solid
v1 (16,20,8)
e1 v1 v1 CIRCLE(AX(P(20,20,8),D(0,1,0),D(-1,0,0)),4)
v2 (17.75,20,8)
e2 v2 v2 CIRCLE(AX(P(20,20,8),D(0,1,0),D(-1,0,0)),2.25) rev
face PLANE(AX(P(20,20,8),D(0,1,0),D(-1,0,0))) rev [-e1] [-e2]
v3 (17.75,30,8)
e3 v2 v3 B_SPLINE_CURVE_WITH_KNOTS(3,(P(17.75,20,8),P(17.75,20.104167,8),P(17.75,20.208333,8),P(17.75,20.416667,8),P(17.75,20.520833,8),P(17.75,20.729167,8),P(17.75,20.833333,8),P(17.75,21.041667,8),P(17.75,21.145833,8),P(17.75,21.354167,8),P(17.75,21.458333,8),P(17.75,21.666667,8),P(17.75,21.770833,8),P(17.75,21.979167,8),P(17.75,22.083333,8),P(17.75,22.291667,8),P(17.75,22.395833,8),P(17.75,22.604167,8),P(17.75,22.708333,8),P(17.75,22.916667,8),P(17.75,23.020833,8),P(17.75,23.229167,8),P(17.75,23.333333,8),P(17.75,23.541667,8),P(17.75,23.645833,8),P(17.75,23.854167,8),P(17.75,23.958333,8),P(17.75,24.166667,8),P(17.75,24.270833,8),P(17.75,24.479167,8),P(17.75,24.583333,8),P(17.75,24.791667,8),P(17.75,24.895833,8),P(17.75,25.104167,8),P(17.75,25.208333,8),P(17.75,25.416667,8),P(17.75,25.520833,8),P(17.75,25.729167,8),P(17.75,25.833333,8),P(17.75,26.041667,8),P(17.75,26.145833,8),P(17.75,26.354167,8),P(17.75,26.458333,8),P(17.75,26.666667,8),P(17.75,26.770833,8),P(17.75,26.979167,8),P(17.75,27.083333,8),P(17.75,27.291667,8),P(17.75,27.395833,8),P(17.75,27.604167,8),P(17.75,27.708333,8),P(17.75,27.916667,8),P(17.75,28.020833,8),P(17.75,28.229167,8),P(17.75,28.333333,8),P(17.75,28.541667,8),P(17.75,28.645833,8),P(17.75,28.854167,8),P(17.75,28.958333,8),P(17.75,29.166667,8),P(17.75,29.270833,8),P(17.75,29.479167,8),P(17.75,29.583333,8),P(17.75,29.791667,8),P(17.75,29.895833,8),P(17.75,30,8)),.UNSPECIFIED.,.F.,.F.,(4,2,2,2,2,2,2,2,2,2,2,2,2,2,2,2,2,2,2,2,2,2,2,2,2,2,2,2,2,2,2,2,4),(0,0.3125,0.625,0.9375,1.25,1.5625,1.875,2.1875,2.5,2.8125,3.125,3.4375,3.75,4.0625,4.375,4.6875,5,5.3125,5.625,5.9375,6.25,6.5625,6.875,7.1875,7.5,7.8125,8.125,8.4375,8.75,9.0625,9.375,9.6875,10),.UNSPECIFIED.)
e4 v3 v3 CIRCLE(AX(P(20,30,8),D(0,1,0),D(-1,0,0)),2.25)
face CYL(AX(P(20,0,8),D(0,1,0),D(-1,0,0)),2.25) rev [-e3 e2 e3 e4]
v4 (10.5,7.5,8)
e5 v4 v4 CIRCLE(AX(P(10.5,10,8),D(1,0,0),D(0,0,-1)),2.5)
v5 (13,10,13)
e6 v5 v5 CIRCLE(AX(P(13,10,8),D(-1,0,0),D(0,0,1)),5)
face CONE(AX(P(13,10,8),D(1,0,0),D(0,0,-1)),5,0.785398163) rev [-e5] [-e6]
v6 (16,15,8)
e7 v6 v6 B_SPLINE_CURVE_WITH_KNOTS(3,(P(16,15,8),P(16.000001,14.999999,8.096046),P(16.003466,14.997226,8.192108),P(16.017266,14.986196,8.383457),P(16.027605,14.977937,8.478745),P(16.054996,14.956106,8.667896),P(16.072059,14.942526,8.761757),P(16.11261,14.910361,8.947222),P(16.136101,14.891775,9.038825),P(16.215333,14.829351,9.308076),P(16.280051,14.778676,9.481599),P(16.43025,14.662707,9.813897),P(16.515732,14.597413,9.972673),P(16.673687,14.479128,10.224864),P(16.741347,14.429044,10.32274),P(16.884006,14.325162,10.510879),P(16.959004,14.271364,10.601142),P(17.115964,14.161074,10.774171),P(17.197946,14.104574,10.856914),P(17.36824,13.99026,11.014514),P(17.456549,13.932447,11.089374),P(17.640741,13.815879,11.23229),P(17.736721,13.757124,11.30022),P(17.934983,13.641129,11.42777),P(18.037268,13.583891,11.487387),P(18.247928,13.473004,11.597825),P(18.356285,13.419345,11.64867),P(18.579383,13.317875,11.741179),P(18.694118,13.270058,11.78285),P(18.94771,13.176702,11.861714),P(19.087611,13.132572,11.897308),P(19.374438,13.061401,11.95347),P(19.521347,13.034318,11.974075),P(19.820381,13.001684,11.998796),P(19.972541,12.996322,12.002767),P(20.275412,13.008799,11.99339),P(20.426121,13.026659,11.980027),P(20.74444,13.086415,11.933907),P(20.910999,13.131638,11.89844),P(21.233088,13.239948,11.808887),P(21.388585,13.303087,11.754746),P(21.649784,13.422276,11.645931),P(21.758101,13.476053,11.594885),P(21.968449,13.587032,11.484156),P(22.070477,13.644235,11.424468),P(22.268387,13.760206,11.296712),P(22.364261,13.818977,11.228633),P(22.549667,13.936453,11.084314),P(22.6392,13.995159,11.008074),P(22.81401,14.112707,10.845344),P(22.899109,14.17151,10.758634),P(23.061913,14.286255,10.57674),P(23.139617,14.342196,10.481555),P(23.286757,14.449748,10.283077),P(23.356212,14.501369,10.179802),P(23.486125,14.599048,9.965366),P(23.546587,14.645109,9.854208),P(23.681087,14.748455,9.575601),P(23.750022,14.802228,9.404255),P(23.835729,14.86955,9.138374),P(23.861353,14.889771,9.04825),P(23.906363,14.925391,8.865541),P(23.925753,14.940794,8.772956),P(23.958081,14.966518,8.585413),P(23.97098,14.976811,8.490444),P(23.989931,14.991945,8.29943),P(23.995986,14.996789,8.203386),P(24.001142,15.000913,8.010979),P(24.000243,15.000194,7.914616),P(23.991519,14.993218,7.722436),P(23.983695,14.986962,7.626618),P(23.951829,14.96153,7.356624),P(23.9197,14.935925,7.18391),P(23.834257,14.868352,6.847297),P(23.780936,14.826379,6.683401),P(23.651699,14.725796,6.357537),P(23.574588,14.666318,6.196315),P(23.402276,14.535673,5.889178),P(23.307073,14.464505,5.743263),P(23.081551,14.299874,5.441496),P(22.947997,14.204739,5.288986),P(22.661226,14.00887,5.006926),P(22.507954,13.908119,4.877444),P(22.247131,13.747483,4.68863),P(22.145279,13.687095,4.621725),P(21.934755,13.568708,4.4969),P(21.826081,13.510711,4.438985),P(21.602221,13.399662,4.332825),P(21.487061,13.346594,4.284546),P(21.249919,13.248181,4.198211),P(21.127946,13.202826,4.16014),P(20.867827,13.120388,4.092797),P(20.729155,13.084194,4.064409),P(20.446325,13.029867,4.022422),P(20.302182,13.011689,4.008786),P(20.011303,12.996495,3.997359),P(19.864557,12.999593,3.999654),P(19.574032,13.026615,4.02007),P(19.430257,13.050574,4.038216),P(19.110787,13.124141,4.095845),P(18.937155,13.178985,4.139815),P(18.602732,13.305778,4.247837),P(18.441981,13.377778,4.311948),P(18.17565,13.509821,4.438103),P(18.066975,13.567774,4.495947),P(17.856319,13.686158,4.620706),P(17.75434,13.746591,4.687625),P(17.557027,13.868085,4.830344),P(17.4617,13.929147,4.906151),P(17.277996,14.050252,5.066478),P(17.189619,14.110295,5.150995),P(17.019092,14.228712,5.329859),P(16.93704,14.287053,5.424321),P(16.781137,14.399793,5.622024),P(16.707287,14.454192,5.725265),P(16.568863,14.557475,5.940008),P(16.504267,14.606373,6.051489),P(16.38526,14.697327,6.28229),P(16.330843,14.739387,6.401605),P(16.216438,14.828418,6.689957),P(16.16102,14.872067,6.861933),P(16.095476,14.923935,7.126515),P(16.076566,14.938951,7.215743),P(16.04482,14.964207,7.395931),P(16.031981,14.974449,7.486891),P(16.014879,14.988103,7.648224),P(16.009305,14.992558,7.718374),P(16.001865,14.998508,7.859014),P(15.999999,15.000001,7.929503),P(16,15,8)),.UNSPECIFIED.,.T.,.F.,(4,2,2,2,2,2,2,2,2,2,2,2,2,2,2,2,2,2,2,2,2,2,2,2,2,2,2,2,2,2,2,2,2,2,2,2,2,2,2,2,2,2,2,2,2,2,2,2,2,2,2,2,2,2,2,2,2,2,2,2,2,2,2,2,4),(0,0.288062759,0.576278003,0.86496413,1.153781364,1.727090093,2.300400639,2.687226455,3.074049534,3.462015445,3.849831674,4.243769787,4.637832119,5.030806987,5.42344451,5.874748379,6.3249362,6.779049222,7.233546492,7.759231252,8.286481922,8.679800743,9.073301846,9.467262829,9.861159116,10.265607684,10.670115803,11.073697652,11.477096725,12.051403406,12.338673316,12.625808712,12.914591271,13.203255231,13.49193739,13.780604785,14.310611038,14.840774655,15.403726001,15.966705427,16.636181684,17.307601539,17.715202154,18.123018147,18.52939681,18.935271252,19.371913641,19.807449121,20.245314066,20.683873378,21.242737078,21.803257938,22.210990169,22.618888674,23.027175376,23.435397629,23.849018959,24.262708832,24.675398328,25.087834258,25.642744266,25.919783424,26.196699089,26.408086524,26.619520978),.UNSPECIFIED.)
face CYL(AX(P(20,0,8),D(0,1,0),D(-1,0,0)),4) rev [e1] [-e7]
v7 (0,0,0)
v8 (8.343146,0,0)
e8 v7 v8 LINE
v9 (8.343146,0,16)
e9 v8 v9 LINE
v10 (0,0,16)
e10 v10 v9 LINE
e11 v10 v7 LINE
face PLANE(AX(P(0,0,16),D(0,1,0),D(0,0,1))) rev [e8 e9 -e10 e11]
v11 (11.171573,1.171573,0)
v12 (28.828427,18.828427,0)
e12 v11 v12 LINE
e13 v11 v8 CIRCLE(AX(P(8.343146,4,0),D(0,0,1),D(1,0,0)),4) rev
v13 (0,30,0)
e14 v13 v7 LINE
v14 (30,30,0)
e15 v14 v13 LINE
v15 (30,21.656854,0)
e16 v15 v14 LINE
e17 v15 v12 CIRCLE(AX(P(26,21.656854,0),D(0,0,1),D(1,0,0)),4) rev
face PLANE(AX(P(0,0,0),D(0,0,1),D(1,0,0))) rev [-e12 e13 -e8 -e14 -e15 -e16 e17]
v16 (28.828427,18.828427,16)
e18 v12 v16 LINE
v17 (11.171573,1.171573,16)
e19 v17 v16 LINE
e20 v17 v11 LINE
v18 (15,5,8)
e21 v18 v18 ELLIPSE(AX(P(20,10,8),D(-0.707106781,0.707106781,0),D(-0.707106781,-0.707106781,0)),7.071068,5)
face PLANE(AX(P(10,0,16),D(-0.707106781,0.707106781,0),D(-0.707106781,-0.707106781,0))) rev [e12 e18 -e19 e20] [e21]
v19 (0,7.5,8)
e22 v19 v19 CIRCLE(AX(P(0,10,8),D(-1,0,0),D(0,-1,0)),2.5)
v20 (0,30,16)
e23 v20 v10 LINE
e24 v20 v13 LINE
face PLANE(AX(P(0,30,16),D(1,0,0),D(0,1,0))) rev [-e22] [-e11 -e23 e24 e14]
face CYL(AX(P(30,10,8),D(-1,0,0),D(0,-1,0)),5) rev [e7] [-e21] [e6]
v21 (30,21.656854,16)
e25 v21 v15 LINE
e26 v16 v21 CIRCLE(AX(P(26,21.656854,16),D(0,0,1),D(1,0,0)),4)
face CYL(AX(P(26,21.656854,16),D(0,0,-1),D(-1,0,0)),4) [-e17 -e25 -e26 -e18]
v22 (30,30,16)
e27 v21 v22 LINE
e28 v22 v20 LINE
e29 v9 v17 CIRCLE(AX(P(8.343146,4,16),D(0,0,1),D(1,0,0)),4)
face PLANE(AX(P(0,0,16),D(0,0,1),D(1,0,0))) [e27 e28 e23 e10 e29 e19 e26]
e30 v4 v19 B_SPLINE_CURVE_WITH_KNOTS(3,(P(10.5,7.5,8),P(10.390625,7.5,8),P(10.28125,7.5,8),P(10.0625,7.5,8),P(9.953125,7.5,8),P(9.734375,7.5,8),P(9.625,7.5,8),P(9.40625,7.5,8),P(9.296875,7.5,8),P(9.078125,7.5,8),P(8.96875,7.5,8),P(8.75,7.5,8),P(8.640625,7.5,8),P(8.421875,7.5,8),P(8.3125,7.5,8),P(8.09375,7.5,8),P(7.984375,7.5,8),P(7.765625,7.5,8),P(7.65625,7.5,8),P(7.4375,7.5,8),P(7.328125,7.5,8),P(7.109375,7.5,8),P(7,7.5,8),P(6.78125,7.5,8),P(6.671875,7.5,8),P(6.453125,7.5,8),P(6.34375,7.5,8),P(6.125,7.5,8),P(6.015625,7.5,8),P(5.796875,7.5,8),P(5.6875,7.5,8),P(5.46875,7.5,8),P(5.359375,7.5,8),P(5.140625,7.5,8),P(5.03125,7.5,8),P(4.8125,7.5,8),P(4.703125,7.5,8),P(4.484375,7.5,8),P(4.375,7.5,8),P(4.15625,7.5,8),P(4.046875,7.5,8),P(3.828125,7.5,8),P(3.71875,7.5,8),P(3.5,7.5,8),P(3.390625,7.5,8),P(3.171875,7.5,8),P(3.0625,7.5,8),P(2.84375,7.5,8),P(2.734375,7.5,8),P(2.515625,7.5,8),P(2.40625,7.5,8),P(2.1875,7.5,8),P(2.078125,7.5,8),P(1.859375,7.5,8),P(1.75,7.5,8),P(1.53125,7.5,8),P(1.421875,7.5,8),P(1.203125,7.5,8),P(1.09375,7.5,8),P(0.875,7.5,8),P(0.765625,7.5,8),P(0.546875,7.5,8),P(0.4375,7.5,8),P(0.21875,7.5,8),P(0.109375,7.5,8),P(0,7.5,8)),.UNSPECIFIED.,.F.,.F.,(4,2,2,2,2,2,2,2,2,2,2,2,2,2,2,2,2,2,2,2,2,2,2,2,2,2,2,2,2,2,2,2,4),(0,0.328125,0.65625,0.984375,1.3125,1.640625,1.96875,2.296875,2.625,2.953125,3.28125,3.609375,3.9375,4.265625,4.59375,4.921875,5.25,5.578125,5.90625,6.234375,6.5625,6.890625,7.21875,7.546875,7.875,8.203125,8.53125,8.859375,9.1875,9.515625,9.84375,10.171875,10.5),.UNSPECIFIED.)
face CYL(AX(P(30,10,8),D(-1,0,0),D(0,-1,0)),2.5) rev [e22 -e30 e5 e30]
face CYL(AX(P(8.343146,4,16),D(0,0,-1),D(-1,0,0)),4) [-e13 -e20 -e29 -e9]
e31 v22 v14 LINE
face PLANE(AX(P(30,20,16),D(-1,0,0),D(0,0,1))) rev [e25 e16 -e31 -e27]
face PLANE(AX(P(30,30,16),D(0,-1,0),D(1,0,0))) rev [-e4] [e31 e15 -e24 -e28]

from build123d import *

# Parameters (mm, degrees)
BOSS_EXTRUDE1_DEPTH = 16
SKETCH3_R           = 2.25
CUT_EXTRUDE1_DEPTH  = 46.343136195
SKETCH2_R           = 2.5
CUT_EXTRUDE2_DEPTH  = 46.343136195
SKETCH4_R           = 5
CUT_EXTRUDE3_DEPTH  = 40.446165923
SKETCH5_R           = 4
CUT_EXTRUDE4_DEPTH  = 40.446165847
CHAMFER1_SIZE       = 3
FILLET2_R           = 4


with BuildPart() as part:
    # Sketch1 → Boss-Extrude1 (new body)
    with BuildSketch(Plane.XY):
        Polygon((0, 0), (10, 0), (30, 20), (30, 30), (0, 30), align=None)
    extrude(amount=BOSS_EXTRUDE1_DEPTH)

    # Sketch3 → Cut-Extrude1 (cut, through all)
    with BuildSketch(Plane(origin=(0, 30, 0), x_dir=(1, 0, 0), z_dir=(0, 1, 0))):
        with Locations(Location((20, -8, 0), (0, 0, 180))):
            Circle(SKETCH3_R)
    extrude(amount=-CUT_EXTRUDE1_DEPTH, mode=Mode.SUBTRACT)

    # Sketch2 → Cut-Extrude2 (cut, through all)
    with BuildSketch(Plane.ZY):
        with Locations(Location((8, 10, 0), (0, 0, 270))):
            Circle(SKETCH2_R)
    extrude(amount=-CUT_EXTRUDE2_DEPTH, mode=Mode.SUBTRACT)

    # Sketch4 → Cut-Extrude3 (cut, through all)
    with BuildSketch(Plane.ZY.offset(-10)):
        with Locations(Location((8, 10, 0), (0, 0, 270))):
            Circle(SKETCH4_R)
    extrude(amount=-CUT_EXTRUDE3_DEPTH, mode=Mode.SUBTRACT)

    # Sketch5 → Cut-Extrude4 (cut, through all)
    with BuildSketch(Plane(origin=(0, 20, 0), x_dir=(1, 0, 0), z_dir=(0, 1, 0))):
        with Locations(Location((20, -8, 0), (0, 0, 180))):
            Circle(SKETCH5_R)
    extrude(amount=-CUT_EXTRUDE4_DEPTH, mode=Mode.SUBTRACT)

    # Chamfer1
    # the kernel refuses this chamfer: 3 mm, written as the material it adds along each edge
    with BuildSketch(Plane(origin=(10, 10, 8), x_dir=(0, -1, 0), z_dir=(0, 0, -1))) as chamfer1_piece_1_section:
        Polygon((5, -CHAMFER1_SIZE), (5 - CHAMFER1_SIZE, 0), (5, 0), align=None)
    chamfer1_piece_1 = revolve(axis=Axis((10, 10, 8), (-1, 0, 0)), mode=Mode.PRIVATE)
    chamfer1_piece_1 = chamfer1_piece_1 - Plane(origin=(11.757355127, 10, 8), x_dir=(0, -1, 0), z_dir=(-1, 0, 0)) * Cylinder(2.5, 21, mode=Mode.PRIVATE)
    add(chamfer1_piece_1)

    # Fillet2
    fillet2_edges = [part.edges().sort_by_distance(p)[0] for p in [
        (30, 20, 8),
        (10, 0, 8),
    ]]
    fillet(fillet2_edges, radius=FILLET2_R)


solid = part.part
